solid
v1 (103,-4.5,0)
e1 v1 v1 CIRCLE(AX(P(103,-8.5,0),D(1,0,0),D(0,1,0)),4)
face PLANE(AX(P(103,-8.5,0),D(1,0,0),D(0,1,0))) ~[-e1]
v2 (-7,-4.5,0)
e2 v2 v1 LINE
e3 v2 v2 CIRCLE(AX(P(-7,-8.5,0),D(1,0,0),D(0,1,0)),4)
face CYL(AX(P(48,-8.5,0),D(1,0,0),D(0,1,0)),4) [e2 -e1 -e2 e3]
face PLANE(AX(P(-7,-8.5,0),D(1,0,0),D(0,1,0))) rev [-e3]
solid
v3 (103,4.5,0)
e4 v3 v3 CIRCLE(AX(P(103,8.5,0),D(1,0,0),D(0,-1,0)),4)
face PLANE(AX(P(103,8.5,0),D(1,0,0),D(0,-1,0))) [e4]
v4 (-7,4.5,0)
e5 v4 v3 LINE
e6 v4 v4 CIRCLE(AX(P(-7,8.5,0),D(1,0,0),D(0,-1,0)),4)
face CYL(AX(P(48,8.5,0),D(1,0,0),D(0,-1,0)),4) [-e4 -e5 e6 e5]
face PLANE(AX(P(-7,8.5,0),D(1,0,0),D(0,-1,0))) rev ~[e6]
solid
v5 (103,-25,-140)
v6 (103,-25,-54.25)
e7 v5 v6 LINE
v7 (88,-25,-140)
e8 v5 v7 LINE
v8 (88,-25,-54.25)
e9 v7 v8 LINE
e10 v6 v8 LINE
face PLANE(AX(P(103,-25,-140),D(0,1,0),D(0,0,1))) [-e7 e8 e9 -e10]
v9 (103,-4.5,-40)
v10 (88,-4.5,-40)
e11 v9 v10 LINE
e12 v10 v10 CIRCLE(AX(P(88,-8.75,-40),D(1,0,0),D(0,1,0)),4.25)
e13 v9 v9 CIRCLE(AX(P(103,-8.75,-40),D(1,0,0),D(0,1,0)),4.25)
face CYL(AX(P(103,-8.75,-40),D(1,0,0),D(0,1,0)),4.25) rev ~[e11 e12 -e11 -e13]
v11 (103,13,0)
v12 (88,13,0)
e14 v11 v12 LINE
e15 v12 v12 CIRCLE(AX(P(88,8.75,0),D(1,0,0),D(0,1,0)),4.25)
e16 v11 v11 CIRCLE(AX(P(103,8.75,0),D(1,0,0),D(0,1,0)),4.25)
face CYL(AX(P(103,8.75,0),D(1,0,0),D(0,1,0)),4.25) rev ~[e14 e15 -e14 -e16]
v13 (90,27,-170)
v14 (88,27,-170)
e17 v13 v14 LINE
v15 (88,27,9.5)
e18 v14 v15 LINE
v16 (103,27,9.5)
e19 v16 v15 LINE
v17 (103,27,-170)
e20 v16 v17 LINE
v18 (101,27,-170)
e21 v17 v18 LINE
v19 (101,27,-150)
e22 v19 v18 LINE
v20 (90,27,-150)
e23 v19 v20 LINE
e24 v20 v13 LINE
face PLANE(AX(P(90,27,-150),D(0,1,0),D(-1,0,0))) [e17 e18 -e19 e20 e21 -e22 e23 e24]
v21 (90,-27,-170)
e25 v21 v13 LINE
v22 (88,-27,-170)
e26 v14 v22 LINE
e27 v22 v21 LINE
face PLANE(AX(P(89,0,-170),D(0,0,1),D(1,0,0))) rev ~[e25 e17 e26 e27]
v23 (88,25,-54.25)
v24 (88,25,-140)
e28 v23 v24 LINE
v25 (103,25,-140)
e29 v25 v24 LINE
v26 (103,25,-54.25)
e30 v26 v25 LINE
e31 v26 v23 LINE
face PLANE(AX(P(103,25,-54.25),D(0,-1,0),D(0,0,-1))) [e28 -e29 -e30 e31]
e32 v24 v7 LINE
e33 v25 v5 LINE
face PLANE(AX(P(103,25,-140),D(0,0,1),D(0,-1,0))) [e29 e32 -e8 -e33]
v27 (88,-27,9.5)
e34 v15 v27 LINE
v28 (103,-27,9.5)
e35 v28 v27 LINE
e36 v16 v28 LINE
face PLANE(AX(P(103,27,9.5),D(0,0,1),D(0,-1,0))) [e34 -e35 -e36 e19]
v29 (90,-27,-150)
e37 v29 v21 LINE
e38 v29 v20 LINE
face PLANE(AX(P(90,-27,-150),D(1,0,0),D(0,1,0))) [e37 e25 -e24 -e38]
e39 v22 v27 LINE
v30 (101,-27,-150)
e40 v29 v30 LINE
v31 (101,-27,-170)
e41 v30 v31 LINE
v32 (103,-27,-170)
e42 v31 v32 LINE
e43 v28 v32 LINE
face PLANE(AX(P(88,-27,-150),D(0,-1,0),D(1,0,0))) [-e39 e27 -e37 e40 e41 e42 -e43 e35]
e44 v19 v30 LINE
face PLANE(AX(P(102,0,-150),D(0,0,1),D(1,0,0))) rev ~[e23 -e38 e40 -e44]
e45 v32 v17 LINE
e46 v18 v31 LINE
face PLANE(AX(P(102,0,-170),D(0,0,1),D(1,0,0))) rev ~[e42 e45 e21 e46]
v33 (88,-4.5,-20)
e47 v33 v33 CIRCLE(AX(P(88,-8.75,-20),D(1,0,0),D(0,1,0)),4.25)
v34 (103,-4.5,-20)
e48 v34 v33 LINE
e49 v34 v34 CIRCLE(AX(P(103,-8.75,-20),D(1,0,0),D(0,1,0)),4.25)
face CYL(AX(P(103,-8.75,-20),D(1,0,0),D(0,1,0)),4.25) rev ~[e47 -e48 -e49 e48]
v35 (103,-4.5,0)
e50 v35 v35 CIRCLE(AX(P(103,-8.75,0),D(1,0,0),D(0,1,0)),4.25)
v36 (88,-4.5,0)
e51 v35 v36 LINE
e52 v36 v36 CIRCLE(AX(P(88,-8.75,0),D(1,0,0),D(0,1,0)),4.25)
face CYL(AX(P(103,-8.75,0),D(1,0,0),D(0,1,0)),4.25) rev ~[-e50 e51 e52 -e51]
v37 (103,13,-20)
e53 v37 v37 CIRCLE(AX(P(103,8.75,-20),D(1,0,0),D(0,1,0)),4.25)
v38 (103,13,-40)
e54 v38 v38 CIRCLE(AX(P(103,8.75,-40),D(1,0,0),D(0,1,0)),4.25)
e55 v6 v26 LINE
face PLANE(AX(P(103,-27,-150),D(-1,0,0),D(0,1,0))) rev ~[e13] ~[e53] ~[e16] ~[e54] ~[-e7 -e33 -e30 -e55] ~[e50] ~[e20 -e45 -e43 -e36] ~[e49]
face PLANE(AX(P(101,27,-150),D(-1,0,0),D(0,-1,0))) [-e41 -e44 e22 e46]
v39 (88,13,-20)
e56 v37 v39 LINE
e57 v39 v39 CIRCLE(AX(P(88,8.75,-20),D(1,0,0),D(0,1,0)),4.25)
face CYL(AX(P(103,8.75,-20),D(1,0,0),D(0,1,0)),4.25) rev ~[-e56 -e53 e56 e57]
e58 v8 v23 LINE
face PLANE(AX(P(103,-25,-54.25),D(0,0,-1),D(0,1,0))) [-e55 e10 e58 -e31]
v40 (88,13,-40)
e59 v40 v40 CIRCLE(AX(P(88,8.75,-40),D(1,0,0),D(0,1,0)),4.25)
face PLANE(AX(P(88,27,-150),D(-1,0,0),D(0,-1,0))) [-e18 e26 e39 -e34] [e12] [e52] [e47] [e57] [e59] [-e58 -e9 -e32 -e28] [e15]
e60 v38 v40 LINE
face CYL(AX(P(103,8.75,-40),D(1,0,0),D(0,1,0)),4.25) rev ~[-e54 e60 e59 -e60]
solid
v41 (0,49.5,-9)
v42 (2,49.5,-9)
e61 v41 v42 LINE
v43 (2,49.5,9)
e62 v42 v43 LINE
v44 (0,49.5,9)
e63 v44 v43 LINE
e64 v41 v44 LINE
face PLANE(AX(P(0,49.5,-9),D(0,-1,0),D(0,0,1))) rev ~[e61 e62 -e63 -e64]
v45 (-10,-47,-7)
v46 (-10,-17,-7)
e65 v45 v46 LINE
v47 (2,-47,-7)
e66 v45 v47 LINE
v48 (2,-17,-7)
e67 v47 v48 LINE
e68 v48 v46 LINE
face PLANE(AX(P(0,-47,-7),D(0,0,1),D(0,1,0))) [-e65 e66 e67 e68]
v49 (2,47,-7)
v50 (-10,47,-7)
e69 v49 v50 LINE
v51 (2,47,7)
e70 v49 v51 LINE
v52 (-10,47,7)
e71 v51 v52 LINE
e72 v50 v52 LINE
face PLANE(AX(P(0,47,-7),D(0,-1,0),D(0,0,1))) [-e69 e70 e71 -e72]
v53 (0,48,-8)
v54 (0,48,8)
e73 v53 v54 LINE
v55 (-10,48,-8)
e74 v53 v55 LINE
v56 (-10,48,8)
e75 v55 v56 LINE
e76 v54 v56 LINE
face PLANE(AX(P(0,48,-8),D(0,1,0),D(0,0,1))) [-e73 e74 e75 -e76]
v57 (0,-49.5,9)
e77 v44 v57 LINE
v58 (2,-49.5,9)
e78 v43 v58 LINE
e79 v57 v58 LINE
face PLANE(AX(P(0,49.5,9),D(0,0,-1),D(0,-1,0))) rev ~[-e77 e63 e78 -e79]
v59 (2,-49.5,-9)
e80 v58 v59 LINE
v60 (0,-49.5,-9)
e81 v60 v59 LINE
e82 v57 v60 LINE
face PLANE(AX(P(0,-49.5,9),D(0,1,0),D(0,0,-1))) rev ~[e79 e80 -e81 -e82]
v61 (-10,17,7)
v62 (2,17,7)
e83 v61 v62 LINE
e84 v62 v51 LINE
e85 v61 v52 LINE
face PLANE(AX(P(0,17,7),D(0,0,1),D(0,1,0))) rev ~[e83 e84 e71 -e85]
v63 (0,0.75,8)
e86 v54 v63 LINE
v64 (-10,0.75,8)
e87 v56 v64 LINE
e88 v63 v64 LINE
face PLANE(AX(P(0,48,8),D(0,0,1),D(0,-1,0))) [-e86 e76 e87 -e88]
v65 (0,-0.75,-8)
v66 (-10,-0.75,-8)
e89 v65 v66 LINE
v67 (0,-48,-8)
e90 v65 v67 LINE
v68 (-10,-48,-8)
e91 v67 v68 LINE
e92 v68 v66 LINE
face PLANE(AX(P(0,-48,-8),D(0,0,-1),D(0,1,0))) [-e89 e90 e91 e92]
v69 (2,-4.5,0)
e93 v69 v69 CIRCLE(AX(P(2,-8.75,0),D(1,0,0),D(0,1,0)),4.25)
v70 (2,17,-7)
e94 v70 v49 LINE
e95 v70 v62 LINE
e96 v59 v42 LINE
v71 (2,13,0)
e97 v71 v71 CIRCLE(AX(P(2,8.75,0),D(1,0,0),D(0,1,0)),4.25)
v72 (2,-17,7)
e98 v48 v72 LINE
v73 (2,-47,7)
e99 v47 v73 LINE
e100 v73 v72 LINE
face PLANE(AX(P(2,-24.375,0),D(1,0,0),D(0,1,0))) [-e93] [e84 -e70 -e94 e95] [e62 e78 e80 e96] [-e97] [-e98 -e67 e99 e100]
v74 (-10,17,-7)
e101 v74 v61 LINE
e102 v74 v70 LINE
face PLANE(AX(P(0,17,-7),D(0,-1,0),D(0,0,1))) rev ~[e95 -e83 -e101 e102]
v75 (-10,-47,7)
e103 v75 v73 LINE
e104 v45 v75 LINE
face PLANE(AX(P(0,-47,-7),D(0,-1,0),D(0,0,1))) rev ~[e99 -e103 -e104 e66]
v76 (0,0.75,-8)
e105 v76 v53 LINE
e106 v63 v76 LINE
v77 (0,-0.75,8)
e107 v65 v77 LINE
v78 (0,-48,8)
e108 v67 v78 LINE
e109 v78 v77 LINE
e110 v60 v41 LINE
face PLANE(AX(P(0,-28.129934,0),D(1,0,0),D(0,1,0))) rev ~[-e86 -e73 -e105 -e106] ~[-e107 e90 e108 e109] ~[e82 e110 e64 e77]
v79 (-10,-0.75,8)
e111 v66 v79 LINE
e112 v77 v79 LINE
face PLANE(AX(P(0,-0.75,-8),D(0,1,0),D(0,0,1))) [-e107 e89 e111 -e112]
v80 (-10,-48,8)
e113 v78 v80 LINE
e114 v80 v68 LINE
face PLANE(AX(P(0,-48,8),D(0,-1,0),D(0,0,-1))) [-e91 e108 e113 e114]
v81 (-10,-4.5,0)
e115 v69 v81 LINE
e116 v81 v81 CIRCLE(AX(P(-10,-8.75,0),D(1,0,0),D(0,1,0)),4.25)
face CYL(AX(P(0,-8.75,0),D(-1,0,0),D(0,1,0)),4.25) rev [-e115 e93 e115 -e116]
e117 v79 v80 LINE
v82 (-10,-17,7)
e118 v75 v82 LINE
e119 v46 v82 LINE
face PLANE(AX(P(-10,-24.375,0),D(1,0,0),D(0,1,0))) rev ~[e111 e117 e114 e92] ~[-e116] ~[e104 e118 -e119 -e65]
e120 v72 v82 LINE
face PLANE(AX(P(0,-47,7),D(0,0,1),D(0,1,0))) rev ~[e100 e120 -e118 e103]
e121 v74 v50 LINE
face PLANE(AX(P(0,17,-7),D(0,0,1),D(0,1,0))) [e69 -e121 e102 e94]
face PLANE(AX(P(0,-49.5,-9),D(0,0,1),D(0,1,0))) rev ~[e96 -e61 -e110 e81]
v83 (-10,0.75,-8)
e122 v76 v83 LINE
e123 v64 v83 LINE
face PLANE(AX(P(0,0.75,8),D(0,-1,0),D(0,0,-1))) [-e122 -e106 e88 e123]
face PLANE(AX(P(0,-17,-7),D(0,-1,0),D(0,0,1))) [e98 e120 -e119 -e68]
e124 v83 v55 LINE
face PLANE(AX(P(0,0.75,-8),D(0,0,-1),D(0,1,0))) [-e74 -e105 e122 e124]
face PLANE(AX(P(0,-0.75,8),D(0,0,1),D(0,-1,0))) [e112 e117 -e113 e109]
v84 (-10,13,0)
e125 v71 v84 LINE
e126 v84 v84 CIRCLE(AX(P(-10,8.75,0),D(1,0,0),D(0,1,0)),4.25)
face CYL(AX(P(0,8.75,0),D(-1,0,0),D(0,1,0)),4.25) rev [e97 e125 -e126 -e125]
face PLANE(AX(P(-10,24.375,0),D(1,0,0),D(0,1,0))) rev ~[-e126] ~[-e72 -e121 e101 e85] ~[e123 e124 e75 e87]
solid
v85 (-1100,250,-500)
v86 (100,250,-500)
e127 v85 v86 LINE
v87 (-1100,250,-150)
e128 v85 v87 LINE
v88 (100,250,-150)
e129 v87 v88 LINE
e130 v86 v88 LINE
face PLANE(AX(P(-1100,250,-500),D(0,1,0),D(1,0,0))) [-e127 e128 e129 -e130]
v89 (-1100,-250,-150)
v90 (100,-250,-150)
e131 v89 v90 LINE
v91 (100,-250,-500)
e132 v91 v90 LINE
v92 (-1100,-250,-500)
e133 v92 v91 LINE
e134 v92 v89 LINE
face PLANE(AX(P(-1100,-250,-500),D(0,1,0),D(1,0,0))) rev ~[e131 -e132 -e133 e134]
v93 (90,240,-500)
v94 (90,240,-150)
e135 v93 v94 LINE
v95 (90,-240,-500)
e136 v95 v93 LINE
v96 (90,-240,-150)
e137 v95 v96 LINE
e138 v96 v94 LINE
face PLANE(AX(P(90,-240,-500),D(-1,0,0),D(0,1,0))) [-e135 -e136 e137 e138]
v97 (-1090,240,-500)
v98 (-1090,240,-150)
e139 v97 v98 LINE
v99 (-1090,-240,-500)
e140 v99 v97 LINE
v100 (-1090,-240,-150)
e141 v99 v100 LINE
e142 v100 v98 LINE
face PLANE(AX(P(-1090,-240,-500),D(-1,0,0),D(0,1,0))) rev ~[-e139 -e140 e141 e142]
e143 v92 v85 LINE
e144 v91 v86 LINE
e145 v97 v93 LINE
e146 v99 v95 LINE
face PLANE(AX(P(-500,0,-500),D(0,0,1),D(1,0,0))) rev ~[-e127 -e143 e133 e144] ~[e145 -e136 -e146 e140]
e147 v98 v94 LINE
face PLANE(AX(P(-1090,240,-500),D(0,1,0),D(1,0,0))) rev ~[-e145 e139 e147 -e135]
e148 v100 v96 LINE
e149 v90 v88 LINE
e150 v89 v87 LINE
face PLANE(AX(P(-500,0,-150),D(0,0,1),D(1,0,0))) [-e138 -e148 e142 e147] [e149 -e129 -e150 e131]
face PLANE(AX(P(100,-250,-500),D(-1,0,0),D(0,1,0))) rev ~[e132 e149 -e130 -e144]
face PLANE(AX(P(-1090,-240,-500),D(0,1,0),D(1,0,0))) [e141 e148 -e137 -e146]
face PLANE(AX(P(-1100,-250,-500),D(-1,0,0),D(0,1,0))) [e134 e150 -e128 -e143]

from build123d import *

# Parameters (mm, degrees)
F0_W          = 1.5
F0_H          = 1
F0_H_2        = 16
F0_R          = 4.25
F0_W_2        = 30
F0_H_3        = 14
F1_DEPTH      = 2
F2_DEPTH      = 10
F2_DEPTH_BACK = 2
F5_W          = 1200
F5_H          = 500
F5_W_2        = 1180
F5_H_2        = 480
F6_DEPTH      = 350
F8_W          = 10
F8_H          = 2
F8_W_2        = 1
F8_H_2        = 50
F9_DEPTH      = 10
F10_DEPTH     = 20
F11_R         = 4.25
F12_DEPTH     = 15
F13_W         = 110
F13_H         = 4


# Not quite as in the source:
# - a feature names something its author has since deleted; it is built from what else it names
# - the program builds the solid bodies; features that only make, move or delete a surface that nothing else refers to are left out


with BuildPart() as f1:
    # F0 (on Right) → F1 (new body)
    with BuildSketch(Plane.YZ):
        Polygon((-0.75, 9), (-49.5, 9), (-49.5, -9), (-0.75, -9), (-0.75, -8), (-13, -8), (-16, -8), (-48, -8), (-48, 8), (-16, 8), (-13, 8), (-0.75, 8), align=None)
        with Locations((0, 8.5)):
            Rectangle(F0_W, F0_H)
        Polygon((49.5, 9), (0.75, 9), (0.75, 8), (13, 8), (16, 8), (48, 8), (48, -8), (16, -8), (13, -8), (0.75, -8), (0.75, -9), (49.5, -9), align=None)
        with Locations((0, -8.5)):
            Rectangle(F0_W, F0_H)
        Rectangle(F0_W, F0_H_2)
        Polygon((13, 8), (0.75, 8), (0.75, -8), (13, -8), (16, -8), (48, -8), (48, 8), (16, 8), align=None)
        with Locations((8.75, 0)):
            Circle(F0_R, mode=Mode.SUBTRACT)
        with Locations((32, 0)):
            Rectangle(F0_W_2, F0_H_3, mode=Mode.SUBTRACT)
    extrude(amount=F1_DEPTH)

    # F0 (on Right) → F2 (join, two sides)
    with BuildSketch(Plane.YZ) as f2_sk:
        Polygon((-0.75, -8), (-0.75, 8), (-13, 8), (-16, 8), (-48, 8), (-48, -8), (-16, -8), (-13, -8), align=None)
        with Locations((-32, 0)):
            Rectangle(F0_W_2, F0_H_3, mode=Mode.SUBTRACT)
        with Locations((-8.75, 0)):
            Circle(F0_R, mode=Mode.SUBTRACT)
        Polygon((13, 8), (0.75, 8), (0.75, -8), (13, -8), (16, -8), (48, -8), (48, 8), (16, 8), align=None)
        with Locations((8.75, 0)):
            Circle(F0_R, mode=Mode.SUBTRACT)
        with Locations((32, 0)):
            Rectangle(F0_W_2, F0_H_3, mode=Mode.SUBTRACT)
    extrude(amount=-F2_DEPTH)
    extrude(f2_sk.sketch, amount=F2_DEPTH_BACK)


with BuildPart() as f6:
    # F5 (on offset) → F6 (new body)
    with BuildSketch(Plane.XY.offset(-500)):
        with Locations((-500, 0)):
            Rectangle(F5_W, F5_H)
        with Locations((-500, 0)):
            Rectangle(F5_W_2, F5_H_2, mode=Mode.SUBTRACT)
    extrude(amount=F6_DEPTH)


with BuildPart() as f9:
    # F8 (on face) → F9 (new body)
    with BuildSketch(Plane.XY.offset(-150)):
        Polygon((101, 27), (101, 25), (101, -25), (101, -27), (103, -27), (103, 27), align=None)
        Polygon((90, -25), (90, 25), (90, 27), (88, 27), (88, -27), (90, -27), align=None)
        with Locations((95, 26)):
            Rectangle(F8_W, F8_H)
        with Locations((100.5, 26)):
            Rectangle(F8_W_2, F8_H)
        with Locations((100.5, -26)):
            Rectangle(F8_W_2, F8_H)
        with Locations((95, -26)):
            Rectangle(F8_W, F8_H)
        with Locations((100.5, 0)):
            Rectangle(F8_W_2, F8_H_2)
        with Locations((95, 0)):
            Rectangle(F8_W, F8_H_2)
    extrude(amount=F9_DEPTH)

    # F8 (on face) → F10 (join)
    with BuildSketch(Plane.XY.offset(-150)):
        Polygon((90, -25), (90, 25), (90, 27), (88, 27), (88, -27), (90, -27), align=None)
        Polygon((101, 27), (101, 25), (101, -25), (101, -27), (103, -27), (103, 27), align=None)
    extrude(amount=-F10_DEPTH)

    # F11 (on face) → F12 (join)
    with BuildSketch(Plane.YZ.offset(103)):
        Polygon((-25, -140), (-27, -140), (-27, -150), (27, -150), (27, -140), (25, -140), align=None)
        Polygon((-27, 9.5), (-27, -140), (-25, -140), (-25, -54.25), (25, -54.25), (25, -140), (27, -140), (27, 9.5), align=None)
        with Locations((-8.75, -40)):
            Circle(F11_R, mode=Mode.SUBTRACT)
        with Locations((-8.75, -20)):
            Circle(F11_R, mode=Mode.SUBTRACT)
        with Locations((-8.75, 0)):
            Circle(F11_R, mode=Mode.SUBTRACT)
        with Locations((8.75, -40)):
            Circle(F11_R, mode=Mode.SUBTRACT)
        with Locations((8.75, -20)):
            Circle(F11_R, mode=Mode.SUBTRACT)
        with Locations((8.75, 0)):
            Circle(F11_R, mode=Mode.SUBTRACT)
    extrude(amount=-F12_DEPTH)


with BuildPart() as f14:
    # F13 (on Top) → F14 (revolve)
    with BuildSketch(Plane.XY):
        with Locations((48, -6.5)):
            Rectangle(F13_W, F13_H)
    revolve(axis=Axis((48, -8.5, 0), (1, 0, 0)))


with BuildPart() as f15:
    # F13 (on Top) → F15 (revolve)
    with BuildSketch(Plane.XY):
        with Locations((48, 6.5)):
            Rectangle(F13_W, F13_H)
    revolve(axis=Axis((48, 8.5, 0), (1, 0, 0)))


solid = Compound([f1.part, f6.part, f9.part, f14.part, f15.part])
